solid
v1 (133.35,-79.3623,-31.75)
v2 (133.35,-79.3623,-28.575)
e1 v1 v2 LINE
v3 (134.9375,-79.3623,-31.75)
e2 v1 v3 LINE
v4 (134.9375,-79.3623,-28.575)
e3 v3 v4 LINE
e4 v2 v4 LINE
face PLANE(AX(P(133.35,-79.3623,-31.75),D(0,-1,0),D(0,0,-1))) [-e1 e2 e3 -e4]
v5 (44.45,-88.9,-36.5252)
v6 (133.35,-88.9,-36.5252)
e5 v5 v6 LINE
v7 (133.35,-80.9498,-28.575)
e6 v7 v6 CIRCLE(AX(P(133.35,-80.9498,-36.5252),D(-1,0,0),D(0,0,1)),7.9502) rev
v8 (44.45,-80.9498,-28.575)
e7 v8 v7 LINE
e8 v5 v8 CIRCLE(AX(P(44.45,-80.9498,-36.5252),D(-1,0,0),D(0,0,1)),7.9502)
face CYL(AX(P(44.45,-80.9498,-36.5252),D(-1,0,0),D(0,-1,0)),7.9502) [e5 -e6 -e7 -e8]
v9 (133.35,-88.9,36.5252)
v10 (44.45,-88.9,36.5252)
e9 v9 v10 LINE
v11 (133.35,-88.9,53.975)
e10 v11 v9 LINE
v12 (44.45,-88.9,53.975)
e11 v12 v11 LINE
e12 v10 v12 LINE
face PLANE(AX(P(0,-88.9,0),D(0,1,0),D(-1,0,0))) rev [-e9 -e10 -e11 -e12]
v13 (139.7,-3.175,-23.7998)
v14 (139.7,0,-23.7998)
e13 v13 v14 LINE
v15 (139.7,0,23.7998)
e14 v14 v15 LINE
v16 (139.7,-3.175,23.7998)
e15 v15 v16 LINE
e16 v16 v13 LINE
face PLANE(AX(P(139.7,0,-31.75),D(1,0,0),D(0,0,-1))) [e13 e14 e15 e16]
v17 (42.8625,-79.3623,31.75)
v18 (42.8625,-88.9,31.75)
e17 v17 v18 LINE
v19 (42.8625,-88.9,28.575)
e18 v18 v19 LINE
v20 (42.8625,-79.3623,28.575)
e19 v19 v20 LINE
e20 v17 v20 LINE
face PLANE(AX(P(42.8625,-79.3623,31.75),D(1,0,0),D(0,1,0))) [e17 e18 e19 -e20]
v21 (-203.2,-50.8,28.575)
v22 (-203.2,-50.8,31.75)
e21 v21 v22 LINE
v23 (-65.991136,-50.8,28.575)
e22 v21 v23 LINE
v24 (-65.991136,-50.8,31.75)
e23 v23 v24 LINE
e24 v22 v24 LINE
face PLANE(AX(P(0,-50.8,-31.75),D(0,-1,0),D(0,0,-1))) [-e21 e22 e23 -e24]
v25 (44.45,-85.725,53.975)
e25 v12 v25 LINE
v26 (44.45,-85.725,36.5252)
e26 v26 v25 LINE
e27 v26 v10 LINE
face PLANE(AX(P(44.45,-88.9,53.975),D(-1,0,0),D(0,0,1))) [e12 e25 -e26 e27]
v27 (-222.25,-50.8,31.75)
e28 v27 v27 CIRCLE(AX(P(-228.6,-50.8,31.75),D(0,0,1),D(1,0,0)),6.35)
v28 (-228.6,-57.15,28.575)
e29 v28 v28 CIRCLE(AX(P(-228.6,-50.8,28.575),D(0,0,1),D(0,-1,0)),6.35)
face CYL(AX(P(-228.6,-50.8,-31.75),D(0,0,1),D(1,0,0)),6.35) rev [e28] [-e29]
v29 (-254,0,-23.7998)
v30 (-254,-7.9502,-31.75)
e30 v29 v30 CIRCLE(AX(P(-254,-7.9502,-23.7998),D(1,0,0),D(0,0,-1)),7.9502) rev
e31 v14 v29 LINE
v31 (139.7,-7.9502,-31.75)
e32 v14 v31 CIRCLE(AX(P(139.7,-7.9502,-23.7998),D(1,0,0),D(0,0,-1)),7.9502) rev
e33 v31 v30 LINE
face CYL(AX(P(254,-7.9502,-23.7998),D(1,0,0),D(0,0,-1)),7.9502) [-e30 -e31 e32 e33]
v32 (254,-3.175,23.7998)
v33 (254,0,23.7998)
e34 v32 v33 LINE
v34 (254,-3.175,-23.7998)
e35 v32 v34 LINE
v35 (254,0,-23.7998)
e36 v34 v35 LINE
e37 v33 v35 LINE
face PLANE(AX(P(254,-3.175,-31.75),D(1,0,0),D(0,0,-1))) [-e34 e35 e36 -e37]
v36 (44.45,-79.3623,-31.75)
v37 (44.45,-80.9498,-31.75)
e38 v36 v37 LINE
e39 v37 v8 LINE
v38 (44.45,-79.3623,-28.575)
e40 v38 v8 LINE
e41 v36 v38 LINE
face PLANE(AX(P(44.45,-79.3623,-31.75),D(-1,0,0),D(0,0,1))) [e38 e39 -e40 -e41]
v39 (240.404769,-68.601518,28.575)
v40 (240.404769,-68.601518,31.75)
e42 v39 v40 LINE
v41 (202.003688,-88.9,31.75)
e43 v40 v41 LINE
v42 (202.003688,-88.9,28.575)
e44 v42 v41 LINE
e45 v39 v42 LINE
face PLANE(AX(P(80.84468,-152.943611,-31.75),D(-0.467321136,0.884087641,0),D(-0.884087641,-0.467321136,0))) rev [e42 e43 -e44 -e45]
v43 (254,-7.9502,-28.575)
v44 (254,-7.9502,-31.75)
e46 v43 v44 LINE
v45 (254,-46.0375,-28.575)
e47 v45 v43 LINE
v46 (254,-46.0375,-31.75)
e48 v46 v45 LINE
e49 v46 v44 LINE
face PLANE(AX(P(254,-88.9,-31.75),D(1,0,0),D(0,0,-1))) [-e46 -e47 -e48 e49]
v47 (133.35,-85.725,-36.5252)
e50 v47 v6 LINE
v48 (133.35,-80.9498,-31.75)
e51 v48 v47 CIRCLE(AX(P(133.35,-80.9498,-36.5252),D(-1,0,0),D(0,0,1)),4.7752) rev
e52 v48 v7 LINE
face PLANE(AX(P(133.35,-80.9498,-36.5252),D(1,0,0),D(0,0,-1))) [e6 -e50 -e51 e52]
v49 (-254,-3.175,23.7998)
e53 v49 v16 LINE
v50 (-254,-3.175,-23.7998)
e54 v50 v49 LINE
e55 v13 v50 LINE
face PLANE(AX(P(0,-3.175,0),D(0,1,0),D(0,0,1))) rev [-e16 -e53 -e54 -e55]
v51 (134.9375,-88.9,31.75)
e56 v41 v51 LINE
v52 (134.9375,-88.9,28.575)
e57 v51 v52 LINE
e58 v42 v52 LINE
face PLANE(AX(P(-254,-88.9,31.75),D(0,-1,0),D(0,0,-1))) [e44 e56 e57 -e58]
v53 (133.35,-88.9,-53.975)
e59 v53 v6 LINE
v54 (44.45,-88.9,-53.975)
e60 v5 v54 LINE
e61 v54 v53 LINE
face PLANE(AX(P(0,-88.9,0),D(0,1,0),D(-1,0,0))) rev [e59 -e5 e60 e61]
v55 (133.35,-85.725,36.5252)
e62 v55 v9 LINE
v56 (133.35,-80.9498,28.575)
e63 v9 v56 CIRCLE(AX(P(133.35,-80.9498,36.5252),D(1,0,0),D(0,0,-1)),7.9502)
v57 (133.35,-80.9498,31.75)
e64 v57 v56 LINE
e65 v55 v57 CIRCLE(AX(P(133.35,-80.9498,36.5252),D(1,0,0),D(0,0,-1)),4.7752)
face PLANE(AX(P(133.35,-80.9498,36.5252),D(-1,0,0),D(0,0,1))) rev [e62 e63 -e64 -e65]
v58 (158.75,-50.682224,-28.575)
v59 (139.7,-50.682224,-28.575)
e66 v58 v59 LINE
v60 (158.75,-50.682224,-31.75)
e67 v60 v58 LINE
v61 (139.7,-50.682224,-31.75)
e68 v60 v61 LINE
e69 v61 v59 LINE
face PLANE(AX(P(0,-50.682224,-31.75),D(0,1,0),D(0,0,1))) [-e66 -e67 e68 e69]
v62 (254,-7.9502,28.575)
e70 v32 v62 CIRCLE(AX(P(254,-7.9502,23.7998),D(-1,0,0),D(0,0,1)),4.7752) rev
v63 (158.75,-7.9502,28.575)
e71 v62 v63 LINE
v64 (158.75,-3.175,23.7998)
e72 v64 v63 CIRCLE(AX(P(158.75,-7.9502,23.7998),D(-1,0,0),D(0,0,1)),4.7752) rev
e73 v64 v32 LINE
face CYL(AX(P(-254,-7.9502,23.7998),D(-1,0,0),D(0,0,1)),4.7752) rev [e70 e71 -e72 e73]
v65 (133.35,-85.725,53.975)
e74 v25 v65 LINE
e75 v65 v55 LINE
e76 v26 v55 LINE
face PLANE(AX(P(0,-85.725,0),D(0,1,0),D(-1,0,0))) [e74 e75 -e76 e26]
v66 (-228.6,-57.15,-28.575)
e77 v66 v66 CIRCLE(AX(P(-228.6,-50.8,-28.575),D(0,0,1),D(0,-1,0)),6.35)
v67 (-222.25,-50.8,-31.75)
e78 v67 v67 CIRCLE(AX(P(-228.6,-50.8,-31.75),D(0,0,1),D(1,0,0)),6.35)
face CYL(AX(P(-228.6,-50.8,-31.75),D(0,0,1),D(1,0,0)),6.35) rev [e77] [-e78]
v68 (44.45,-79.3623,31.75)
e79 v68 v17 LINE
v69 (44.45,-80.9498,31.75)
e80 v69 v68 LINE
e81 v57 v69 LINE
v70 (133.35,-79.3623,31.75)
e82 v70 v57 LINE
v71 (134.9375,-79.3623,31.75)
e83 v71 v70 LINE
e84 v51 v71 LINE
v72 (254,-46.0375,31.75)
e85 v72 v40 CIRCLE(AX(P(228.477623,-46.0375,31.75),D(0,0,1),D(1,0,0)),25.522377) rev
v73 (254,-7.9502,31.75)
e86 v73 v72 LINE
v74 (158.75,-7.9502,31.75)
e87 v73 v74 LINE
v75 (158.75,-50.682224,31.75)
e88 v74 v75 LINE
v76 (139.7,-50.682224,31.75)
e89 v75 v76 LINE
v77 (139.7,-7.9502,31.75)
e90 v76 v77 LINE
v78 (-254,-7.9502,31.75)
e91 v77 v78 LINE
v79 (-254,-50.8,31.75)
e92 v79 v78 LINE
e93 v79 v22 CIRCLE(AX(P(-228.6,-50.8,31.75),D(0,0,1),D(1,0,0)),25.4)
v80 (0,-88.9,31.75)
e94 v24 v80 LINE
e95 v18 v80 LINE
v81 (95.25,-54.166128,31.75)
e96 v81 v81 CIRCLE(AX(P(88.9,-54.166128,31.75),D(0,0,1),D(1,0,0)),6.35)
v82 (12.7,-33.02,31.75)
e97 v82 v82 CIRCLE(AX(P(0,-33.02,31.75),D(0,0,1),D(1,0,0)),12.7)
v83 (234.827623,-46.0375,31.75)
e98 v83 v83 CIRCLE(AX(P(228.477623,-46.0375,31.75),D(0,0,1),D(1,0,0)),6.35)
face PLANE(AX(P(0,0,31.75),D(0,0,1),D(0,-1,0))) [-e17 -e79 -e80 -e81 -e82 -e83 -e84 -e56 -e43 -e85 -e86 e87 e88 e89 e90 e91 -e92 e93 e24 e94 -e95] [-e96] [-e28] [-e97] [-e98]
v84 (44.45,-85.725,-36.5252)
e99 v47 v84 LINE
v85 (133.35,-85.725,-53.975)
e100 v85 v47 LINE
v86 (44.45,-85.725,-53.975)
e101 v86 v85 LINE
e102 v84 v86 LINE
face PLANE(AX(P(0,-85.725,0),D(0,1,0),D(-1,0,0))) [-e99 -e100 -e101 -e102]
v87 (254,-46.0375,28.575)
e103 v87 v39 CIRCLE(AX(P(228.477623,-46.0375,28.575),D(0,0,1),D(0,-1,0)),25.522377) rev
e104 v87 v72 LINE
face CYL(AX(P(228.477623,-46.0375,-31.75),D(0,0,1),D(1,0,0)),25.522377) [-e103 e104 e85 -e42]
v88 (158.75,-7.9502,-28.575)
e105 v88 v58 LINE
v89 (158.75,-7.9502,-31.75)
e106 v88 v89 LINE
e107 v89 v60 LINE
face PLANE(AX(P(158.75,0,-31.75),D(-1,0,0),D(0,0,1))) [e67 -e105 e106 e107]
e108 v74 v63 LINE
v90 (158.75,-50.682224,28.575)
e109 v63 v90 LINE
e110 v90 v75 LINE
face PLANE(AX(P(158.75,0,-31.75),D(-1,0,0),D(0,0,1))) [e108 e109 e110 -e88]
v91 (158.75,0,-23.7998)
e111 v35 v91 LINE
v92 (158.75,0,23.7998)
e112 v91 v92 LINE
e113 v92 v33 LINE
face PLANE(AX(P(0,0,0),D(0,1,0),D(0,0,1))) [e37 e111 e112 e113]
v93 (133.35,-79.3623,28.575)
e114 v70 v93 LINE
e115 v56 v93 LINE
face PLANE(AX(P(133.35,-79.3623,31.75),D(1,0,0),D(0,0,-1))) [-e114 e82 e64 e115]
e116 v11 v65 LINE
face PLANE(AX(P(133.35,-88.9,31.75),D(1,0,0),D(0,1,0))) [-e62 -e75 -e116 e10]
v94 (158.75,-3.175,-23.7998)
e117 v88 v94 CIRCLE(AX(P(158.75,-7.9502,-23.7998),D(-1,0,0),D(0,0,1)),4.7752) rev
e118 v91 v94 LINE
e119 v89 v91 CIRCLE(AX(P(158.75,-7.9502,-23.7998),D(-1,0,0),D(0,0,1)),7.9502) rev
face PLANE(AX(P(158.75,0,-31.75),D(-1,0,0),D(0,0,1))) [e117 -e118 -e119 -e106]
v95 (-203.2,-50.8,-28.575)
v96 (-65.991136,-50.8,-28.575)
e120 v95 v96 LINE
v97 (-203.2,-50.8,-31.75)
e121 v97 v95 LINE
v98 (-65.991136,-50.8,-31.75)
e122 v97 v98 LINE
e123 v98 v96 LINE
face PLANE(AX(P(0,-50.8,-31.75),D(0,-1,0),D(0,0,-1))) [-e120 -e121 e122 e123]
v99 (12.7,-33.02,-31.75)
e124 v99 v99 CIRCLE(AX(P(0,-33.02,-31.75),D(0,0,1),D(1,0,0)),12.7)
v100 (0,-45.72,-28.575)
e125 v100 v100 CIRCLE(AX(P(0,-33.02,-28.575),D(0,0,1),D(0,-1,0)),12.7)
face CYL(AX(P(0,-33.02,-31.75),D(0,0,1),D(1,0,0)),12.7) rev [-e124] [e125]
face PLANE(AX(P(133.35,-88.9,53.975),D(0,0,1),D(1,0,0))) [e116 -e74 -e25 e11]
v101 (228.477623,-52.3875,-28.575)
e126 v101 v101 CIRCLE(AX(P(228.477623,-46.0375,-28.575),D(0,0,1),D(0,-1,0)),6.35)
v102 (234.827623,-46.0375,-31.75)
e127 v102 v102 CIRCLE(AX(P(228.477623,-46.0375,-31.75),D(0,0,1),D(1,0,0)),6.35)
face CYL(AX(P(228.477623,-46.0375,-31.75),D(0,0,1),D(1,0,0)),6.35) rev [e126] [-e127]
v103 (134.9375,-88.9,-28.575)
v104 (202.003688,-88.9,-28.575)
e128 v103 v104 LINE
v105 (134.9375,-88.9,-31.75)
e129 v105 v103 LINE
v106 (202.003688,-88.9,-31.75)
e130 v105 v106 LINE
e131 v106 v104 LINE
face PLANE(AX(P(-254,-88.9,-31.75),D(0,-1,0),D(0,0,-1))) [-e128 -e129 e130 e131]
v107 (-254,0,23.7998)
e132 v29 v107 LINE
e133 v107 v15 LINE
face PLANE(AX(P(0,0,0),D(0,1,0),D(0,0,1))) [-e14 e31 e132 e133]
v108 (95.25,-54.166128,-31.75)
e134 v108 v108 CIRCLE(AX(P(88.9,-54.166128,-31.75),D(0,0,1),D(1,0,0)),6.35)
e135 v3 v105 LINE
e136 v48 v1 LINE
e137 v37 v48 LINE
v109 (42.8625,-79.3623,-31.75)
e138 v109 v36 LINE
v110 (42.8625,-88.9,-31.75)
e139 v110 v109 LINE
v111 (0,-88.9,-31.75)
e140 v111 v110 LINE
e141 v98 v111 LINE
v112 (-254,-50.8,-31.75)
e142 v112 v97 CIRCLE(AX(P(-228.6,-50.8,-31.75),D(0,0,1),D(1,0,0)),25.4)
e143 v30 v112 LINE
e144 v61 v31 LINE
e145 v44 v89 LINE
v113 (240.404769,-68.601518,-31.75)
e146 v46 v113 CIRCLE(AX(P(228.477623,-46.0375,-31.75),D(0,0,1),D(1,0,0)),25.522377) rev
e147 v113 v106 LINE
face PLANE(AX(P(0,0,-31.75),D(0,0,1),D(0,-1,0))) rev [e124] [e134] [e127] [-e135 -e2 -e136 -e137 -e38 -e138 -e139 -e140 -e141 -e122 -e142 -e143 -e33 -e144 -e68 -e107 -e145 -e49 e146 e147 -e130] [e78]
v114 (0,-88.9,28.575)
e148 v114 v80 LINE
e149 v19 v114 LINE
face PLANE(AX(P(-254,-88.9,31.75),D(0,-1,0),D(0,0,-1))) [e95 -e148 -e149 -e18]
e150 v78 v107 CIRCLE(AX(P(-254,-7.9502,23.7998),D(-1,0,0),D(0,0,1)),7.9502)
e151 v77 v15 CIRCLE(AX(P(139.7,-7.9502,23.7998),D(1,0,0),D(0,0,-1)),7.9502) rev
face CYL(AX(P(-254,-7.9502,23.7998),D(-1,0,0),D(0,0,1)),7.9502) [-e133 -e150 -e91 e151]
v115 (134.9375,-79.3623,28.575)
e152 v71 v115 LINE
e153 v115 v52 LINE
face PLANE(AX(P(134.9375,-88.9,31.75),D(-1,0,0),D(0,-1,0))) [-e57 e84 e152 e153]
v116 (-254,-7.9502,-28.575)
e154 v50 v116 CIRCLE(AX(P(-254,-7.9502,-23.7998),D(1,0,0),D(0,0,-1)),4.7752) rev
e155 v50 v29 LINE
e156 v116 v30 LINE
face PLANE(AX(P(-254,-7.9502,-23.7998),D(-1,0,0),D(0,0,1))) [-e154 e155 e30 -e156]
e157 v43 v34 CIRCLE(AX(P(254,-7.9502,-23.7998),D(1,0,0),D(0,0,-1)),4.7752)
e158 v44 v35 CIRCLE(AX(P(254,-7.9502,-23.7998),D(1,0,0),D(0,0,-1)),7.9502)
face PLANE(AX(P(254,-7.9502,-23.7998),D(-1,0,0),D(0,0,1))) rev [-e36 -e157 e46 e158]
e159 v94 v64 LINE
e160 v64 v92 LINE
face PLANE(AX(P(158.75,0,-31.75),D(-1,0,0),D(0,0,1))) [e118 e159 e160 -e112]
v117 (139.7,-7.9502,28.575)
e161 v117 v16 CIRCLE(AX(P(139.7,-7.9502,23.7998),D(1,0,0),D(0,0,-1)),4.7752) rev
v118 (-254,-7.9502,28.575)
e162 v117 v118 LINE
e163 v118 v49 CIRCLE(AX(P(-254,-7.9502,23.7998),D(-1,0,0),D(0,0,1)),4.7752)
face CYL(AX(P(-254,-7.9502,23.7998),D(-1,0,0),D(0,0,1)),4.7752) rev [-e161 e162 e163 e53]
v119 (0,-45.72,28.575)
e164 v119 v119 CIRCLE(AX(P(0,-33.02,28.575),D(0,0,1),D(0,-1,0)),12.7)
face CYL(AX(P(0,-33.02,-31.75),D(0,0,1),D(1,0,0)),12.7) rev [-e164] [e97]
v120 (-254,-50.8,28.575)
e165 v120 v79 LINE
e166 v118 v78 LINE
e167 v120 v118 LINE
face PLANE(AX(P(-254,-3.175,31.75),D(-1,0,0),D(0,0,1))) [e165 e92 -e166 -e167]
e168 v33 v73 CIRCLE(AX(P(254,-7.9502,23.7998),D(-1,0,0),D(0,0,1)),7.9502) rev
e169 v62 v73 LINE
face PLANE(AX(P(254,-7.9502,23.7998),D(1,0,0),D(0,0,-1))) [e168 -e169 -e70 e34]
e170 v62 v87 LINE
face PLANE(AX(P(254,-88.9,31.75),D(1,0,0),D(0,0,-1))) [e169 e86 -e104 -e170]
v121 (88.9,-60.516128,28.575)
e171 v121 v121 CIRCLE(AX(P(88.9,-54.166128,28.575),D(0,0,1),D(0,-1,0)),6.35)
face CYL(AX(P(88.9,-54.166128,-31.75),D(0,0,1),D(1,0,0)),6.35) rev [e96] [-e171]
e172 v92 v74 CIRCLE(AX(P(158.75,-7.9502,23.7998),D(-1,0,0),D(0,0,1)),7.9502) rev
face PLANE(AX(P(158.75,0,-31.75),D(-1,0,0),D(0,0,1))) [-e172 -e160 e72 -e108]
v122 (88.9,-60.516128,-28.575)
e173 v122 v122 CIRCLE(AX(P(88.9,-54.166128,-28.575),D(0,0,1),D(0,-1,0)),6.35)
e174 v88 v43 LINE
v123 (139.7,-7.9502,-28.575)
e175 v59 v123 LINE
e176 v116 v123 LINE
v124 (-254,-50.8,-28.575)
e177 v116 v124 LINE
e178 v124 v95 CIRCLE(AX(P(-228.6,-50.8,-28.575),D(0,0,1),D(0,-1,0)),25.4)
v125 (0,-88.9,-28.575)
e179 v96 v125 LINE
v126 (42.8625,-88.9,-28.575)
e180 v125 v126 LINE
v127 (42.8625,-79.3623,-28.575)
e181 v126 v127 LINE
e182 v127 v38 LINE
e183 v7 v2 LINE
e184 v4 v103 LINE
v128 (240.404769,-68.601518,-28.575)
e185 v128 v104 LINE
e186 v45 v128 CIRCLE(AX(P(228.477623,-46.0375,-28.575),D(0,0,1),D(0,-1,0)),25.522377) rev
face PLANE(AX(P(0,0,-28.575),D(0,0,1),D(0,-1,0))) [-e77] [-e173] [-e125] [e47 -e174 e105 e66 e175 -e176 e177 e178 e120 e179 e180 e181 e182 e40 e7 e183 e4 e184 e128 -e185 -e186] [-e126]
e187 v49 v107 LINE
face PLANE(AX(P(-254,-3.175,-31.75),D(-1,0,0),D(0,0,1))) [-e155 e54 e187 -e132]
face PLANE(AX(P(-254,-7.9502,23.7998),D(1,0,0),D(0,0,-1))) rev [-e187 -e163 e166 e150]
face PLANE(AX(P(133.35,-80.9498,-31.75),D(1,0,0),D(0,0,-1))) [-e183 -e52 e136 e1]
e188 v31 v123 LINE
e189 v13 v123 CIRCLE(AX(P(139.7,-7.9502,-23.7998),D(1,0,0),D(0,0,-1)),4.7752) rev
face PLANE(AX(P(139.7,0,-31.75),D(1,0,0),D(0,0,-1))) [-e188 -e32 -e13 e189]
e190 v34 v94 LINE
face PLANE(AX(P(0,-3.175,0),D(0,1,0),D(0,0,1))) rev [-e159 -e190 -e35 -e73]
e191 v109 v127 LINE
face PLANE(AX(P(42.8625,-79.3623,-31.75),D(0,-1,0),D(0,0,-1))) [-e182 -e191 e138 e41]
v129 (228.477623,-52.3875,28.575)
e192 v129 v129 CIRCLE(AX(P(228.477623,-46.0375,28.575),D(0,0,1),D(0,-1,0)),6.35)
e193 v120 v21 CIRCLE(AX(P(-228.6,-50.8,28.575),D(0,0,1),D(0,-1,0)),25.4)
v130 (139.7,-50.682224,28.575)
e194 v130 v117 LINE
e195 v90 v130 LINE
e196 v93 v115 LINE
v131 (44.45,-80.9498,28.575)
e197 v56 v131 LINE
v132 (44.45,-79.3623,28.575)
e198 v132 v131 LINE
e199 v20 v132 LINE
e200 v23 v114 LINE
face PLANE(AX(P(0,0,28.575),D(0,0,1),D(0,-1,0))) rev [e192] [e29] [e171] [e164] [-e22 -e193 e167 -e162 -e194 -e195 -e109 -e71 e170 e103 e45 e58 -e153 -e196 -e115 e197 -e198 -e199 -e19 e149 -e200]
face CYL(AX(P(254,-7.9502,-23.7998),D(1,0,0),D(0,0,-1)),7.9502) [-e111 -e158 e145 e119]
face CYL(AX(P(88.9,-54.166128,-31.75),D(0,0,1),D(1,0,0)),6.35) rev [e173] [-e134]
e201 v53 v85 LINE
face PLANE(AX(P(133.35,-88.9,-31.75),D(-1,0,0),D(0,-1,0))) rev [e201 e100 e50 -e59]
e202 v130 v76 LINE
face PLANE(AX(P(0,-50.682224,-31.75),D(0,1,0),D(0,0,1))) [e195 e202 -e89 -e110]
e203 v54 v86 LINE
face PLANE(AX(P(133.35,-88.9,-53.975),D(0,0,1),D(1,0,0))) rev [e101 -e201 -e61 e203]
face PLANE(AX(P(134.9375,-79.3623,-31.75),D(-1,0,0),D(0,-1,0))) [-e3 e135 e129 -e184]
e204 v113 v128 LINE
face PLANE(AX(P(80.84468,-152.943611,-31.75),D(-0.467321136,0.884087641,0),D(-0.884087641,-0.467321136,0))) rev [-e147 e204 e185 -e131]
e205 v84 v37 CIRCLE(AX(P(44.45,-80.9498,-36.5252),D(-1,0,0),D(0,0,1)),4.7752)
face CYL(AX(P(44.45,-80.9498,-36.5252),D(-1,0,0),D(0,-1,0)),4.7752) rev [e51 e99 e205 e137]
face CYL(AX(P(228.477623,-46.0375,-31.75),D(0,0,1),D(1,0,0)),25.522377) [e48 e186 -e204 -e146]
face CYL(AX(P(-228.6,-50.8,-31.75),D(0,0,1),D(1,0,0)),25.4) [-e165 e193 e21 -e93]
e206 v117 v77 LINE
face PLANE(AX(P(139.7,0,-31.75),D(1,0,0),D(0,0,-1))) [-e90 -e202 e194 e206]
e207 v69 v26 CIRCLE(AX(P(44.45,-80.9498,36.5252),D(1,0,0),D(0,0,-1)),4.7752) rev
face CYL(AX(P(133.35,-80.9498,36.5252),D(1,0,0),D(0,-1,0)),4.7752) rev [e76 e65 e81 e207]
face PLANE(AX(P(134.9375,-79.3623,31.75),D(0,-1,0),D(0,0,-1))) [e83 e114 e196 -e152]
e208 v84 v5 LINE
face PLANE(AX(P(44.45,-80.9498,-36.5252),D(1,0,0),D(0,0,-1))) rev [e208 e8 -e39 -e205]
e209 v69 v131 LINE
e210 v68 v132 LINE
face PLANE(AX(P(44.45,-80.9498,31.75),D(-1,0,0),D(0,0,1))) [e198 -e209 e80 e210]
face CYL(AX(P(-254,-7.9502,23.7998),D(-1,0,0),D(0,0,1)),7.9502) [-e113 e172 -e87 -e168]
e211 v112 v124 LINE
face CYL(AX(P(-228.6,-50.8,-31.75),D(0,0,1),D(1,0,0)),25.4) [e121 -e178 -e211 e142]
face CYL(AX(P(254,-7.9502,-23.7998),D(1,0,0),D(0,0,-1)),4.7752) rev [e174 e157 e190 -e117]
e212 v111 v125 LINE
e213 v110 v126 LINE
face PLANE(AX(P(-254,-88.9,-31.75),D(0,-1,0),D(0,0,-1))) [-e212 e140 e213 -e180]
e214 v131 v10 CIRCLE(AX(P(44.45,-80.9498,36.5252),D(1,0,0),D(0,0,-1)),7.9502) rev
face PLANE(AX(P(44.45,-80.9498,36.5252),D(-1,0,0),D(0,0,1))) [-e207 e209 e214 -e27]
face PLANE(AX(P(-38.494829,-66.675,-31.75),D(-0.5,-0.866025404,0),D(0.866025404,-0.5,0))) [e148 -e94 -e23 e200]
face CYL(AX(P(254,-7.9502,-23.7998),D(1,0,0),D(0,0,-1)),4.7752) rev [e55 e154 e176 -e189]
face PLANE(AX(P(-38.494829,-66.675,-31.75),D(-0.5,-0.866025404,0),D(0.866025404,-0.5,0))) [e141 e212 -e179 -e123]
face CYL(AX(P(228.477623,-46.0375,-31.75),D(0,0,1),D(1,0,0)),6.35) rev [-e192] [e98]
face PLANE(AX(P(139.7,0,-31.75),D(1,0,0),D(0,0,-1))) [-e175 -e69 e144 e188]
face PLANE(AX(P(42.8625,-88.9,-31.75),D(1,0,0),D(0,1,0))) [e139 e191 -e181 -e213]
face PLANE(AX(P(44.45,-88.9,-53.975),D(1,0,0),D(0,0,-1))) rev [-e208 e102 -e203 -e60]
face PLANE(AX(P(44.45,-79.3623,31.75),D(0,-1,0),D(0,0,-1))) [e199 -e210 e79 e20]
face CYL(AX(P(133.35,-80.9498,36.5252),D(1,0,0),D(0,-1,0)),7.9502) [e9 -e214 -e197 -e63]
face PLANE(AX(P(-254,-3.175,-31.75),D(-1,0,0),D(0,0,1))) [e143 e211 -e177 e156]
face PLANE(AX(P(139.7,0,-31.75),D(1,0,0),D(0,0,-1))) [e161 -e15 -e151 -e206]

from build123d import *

# Parameters (mm, degrees)
SKETCH1_W                      = 508
SKETCH1_H                      = 63.5
BASE_FLANGE1_DEPTH             = 3.175
EDGE_FLANGE1_STRIP_W           = 22.2504
EDGE_FLANGE1_STRIP_H           = 3.175
EDGE_FLANGE1_STRIP_CUT_DEPTH   = 508
EDGE_FLANGE1_STRIP_2_W         = 22.2504
EDGE_FLANGE1_STRIP_2_H         = 3.175
EDGE_FLANGE1_STRIP_CUT_2_DEPTH = 508
EDGE_FLANGE1_DEPTH             = 508
EDGE_FLANGE1_BEND_DEPTH        = 508
SKETCH12_R                     = 12.7
CUT_EXTRUDE1_DEPTH             = 277.498571425
SKETCH13_R                     = 6.35
CUT_EXTRUDE2_DEPTH             = 277.498571425
CUT_EXTRUDE4_DEPTH             = 277.498571425
SKETCH16_R                     = 6.35
CUT_EXTRUDE5_DEPTH             = 277.498571425
CUT_EXTRUDE6_DEPTH             = 277.498571425
SKETCH18_R                     = 6.35
CUT_EXTRUDE8_DEPTH             = 277.498571425
SKETCH22_W                     = 19.05
SKETCH22_H                     = 50.682224045
CUT_EXTRUDE9_DEPTH             = 277.498571425
EDGE_FLANGE2_STRIP_W           = 22.2504
EDGE_FLANGE2_STRIP_H           = 3.175
EDGE_FLANGE2_STRIP_CUT_DEPTH   = 88.9
EDGE_FLANGE2_RELIEF_W          = 23.8379
EDGE_FLANGE2_RELIEF_H          = 1.5875
EDGE_FLANGE2_RELIEF_CUT_DEPTH  = 3.175
EDGE_FLANGE2_DEPTH             = 88.9


# Sheet-metal steps are written as plain solids
with BuildPart() as part:
    # Sketch1 → Base-Flange1 (new body)
    with BuildSketch(Plane(origin=(0, 0, 0), x_dir=(1, 0, 0), z_dir=(0, 1, 0))):
        Rectangle(SKETCH1_W, SKETCH1_H)
    extrude(amount=-BASE_FLANGE1_DEPTH)

    # Edge-Flange1 strip (across the edge) → Edge-Flange1 strip cut (cut)
    with BuildSketch(Plane(origin=(254, -3.175, 31.75), x_dir=(0, 0, -1), z_dir=(-1, 0, 0))):
        with Locations((-3.175, -1.5875)):
            Rectangle(EDGE_FLANGE1_STRIP_W, EDGE_FLANGE1_STRIP_H)
    extrude(amount=EDGE_FLANGE1_STRIP_CUT_DEPTH, mode=Mode.SUBTRACT)

    # Edge-Flange1 strip 2 (across the edge) → Edge-Flange1 strip cut 2 (cut)
    with BuildSketch(Plane(origin=(-254, -3.175, -31.75), x_dir=(0, 0, 1), z_dir=(1, 0, 0))):
        with Locations((-3.175, -1.5875)):
            Rectangle(EDGE_FLANGE1_STRIP_2_W, EDGE_FLANGE1_STRIP_2_H)
    extrude(amount=EDGE_FLANGE1_STRIP_CUT_2_DEPTH, mode=Mode.SUBTRACT)

    # Edge-Flange1 section (across the edge) → Edge-Flange1 (add)
    with BuildSketch(Plane(origin=(254, -3.175, 31.75), x_dir=(0, 0, -1), z_dir=(-1, 0, 0))):
        with BuildLine():
            Line((0, 4.7752), (0, 85.725))
            Line((0, 85.725), (3.175, 85.725))
            Line((3.175, 85.725), (3.175, 4.7752))
            ThreePointArc((3.175, 4.7752), (4.573623698, 1.398623698), (7.9502, 0))
            Line((7.9502, 0), (7.9502, -3.175))
            ThreePointArc((7.9502, -3.175), (2.328559668, -0.846440332), (0, 4.7752))
        make_face()
    extrude(amount=EDGE_FLANGE1_DEPTH)

    # Edge-Flange1 section 2 (across the edge) → Edge-Flange1 bend (add)
    with BuildSketch(Plane(origin=(-254, -3.175, -31.75), x_dir=(0, 0, 1), z_dir=(1, 0, 0))):
        with BuildLine():
            Line((0, 4.7752), (0, 85.725))
            Line((0, 85.725), (3.175, 85.725))
            Line((3.175, 85.725), (3.175, 4.7752))
            ThreePointArc((3.175, 4.7752), (4.573623698, 1.398623698), (7.9502, 0))
            Line((7.9502, 0), (7.9502, -3.175))
            ThreePointArc((7.9502, -3.175), (2.328559668, -0.846440332), (0, 4.7752))
        make_face()
    extrude(amount=EDGE_FLANGE1_BEND_DEPTH)

    # Sketch12 → Cut-Extrude1 (cut, through all)
    with BuildSketch(Plane.XY.offset(31.75)):
        with Locations((0, -33.02)):
            Circle(SKETCH12_R)
    extrude(amount=-CUT_EXTRUDE1_DEPTH, mode=Mode.SUBTRACT)

    # Sketch13 → Cut-Extrude2 (cut, through all)
    with BuildSketch(Plane.XY.offset(31.75)):
        with Locations((88.9, -54.166128078)):
            Circle(SKETCH13_R)
    extrude(amount=-CUT_EXTRUDE2_DEPTH, mode=Mode.SUBTRACT)

    # Sketch14 → Cut-Extrude4 (cut, through all)
    with BuildSketch(Plane.XY.offset(31.75)):
        with BuildLine():
            Line((-65.991135768, -50.8), (-203.2, -50.8))
            ThreePointArc((-203.2, -50.8), (-228.6, -76.2), (-254, -50.8))
            Line((-254, -50.8), (-254, -88.9))
            Line((-254, -88.9), (0, -88.9))
            Line((0, -88.9), (-65.991135768, -50.8))
        make_face()
    extrude(amount=-CUT_EXTRUDE4_DEPTH, mode=Mode.SUBTRACT)

    # Sketch16 → Cut-Extrude5 (cut, through all)
    with BuildSketch(Plane.XY.offset(31.75)):
        with Locations((-228.6, -50.8)):
            Circle(SKETCH16_R)
    extrude(amount=-CUT_EXTRUDE5_DEPTH, mode=Mode.SUBTRACT)

    # Sketch17 → Cut-Extrude6 (cut, through all)
    with BuildSketch(Plane.XY.offset(31.75)):
        with BuildLine():
            ThreePointArc((254, -46.0375), (250.338556711, -59.209109907), (240.404769023, -68.601518366))
            Line((240.404769023, -68.601518366), (202.003688132, -88.9))
            Line((202.003688132, -88.9), (254, -88.9))
            Line((254, -88.9), (254, -46.0375))
        make_face()
    extrude(amount=-CUT_EXTRUDE6_DEPTH, mode=Mode.SUBTRACT)

    # Sketch18 → Cut-Extrude8 (cut, through all)
    with BuildSketch(Plane.XY.offset(31.75)):
        with Locations((228.477622657, -46.0375)):
            Circle(SKETCH18_R)
    extrude(amount=-CUT_EXTRUDE8_DEPTH, mode=Mode.SUBTRACT)

    # Sketch22 → Cut-Extrude9 (cut, through all)
    with BuildSketch(Plane.XY.offset(31.75)):
        with Locations((149.225, -25.341112023)):
            Rectangle(SKETCH22_W, SKETCH22_H)
    extrude(amount=-CUT_EXTRUDE9_DEPTH, mode=Mode.SUBTRACT)

    # Edge-Flange2 strip (across the edge) → Edge-Flange2 strip cut (cut)
    with BuildSketch(Plane(origin=(133.35, -88.9, -31.75), x_dir=(0, 1, 0), z_dir=(-1, 0, 0))):
        with Locations((-3.175, -1.5875)):
            Rectangle(EDGE_FLANGE2_STRIP_W, EDGE_FLANGE2_STRIP_H)
    edge_flange2_strip_cut = extrude(amount=EDGE_FLANGE2_STRIP_CUT_DEPTH, mode=Mode.SUBTRACT)

    # Edge-Flange2 relief (on the sheet) → Edge-Flange2 relief cut (cut)
    with BuildSketch(Plane(origin=(133.35, -80.9498, -31.75), x_dir=(0, 1, 0), z_dir=(0, 0, -1))):
        with Locations((-10.33145, 0.79375)):
            Rectangle(EDGE_FLANGE2_RELIEF_W, EDGE_FLANGE2_RELIEF_H)
        with Locations((-10.33145, -89.69375)):
            Rectangle(EDGE_FLANGE2_RELIEF_W, EDGE_FLANGE2_RELIEF_H)
    edge_flange2_relief_cut = extrude(amount=-EDGE_FLANGE2_RELIEF_CUT_DEPTH, mode=Mode.SUBTRACT)

    # Edge-Flange2 section (across the edge) → Edge-Flange2 (add)
    with BuildSketch(Plane(origin=(133.35, -88.9, -31.75), x_dir=(0, 1, 0), z_dir=(-1, 0, 0))):
        with BuildLine():
            Line((0, 4.7752), (0, 22.225))
            Line((0, 22.225), (3.175, 22.225))
            Line((3.175, 22.225), (3.175, 4.7752))
            ThreePointArc((3.175, 4.7752), (4.573623698, 1.398623698), (7.9502, 0))
            Line((7.9502, 0), (7.9502, -3.175))
            ThreePointArc((7.9502, -3.175), (2.328559668, -0.846440332), (0, 4.7752))
        make_face()
    edge_flange2 = extrude(amount=EDGE_FLANGE2_DEPTH)

    # Mirror1: Edge-Flange2 strip cut, Edge-Flange2 relief cut, Edge-Flange2 across plane
    add(edge_flange2_strip_cut.mirror(Plane.XY), mode=Mode.SUBTRACT)
    add(edge_flange2_relief_cut.mirror(Plane.XY), mode=Mode.SUBTRACT)
    add(edge_flange2.mirror(Plane.XY))


solid = part.part
